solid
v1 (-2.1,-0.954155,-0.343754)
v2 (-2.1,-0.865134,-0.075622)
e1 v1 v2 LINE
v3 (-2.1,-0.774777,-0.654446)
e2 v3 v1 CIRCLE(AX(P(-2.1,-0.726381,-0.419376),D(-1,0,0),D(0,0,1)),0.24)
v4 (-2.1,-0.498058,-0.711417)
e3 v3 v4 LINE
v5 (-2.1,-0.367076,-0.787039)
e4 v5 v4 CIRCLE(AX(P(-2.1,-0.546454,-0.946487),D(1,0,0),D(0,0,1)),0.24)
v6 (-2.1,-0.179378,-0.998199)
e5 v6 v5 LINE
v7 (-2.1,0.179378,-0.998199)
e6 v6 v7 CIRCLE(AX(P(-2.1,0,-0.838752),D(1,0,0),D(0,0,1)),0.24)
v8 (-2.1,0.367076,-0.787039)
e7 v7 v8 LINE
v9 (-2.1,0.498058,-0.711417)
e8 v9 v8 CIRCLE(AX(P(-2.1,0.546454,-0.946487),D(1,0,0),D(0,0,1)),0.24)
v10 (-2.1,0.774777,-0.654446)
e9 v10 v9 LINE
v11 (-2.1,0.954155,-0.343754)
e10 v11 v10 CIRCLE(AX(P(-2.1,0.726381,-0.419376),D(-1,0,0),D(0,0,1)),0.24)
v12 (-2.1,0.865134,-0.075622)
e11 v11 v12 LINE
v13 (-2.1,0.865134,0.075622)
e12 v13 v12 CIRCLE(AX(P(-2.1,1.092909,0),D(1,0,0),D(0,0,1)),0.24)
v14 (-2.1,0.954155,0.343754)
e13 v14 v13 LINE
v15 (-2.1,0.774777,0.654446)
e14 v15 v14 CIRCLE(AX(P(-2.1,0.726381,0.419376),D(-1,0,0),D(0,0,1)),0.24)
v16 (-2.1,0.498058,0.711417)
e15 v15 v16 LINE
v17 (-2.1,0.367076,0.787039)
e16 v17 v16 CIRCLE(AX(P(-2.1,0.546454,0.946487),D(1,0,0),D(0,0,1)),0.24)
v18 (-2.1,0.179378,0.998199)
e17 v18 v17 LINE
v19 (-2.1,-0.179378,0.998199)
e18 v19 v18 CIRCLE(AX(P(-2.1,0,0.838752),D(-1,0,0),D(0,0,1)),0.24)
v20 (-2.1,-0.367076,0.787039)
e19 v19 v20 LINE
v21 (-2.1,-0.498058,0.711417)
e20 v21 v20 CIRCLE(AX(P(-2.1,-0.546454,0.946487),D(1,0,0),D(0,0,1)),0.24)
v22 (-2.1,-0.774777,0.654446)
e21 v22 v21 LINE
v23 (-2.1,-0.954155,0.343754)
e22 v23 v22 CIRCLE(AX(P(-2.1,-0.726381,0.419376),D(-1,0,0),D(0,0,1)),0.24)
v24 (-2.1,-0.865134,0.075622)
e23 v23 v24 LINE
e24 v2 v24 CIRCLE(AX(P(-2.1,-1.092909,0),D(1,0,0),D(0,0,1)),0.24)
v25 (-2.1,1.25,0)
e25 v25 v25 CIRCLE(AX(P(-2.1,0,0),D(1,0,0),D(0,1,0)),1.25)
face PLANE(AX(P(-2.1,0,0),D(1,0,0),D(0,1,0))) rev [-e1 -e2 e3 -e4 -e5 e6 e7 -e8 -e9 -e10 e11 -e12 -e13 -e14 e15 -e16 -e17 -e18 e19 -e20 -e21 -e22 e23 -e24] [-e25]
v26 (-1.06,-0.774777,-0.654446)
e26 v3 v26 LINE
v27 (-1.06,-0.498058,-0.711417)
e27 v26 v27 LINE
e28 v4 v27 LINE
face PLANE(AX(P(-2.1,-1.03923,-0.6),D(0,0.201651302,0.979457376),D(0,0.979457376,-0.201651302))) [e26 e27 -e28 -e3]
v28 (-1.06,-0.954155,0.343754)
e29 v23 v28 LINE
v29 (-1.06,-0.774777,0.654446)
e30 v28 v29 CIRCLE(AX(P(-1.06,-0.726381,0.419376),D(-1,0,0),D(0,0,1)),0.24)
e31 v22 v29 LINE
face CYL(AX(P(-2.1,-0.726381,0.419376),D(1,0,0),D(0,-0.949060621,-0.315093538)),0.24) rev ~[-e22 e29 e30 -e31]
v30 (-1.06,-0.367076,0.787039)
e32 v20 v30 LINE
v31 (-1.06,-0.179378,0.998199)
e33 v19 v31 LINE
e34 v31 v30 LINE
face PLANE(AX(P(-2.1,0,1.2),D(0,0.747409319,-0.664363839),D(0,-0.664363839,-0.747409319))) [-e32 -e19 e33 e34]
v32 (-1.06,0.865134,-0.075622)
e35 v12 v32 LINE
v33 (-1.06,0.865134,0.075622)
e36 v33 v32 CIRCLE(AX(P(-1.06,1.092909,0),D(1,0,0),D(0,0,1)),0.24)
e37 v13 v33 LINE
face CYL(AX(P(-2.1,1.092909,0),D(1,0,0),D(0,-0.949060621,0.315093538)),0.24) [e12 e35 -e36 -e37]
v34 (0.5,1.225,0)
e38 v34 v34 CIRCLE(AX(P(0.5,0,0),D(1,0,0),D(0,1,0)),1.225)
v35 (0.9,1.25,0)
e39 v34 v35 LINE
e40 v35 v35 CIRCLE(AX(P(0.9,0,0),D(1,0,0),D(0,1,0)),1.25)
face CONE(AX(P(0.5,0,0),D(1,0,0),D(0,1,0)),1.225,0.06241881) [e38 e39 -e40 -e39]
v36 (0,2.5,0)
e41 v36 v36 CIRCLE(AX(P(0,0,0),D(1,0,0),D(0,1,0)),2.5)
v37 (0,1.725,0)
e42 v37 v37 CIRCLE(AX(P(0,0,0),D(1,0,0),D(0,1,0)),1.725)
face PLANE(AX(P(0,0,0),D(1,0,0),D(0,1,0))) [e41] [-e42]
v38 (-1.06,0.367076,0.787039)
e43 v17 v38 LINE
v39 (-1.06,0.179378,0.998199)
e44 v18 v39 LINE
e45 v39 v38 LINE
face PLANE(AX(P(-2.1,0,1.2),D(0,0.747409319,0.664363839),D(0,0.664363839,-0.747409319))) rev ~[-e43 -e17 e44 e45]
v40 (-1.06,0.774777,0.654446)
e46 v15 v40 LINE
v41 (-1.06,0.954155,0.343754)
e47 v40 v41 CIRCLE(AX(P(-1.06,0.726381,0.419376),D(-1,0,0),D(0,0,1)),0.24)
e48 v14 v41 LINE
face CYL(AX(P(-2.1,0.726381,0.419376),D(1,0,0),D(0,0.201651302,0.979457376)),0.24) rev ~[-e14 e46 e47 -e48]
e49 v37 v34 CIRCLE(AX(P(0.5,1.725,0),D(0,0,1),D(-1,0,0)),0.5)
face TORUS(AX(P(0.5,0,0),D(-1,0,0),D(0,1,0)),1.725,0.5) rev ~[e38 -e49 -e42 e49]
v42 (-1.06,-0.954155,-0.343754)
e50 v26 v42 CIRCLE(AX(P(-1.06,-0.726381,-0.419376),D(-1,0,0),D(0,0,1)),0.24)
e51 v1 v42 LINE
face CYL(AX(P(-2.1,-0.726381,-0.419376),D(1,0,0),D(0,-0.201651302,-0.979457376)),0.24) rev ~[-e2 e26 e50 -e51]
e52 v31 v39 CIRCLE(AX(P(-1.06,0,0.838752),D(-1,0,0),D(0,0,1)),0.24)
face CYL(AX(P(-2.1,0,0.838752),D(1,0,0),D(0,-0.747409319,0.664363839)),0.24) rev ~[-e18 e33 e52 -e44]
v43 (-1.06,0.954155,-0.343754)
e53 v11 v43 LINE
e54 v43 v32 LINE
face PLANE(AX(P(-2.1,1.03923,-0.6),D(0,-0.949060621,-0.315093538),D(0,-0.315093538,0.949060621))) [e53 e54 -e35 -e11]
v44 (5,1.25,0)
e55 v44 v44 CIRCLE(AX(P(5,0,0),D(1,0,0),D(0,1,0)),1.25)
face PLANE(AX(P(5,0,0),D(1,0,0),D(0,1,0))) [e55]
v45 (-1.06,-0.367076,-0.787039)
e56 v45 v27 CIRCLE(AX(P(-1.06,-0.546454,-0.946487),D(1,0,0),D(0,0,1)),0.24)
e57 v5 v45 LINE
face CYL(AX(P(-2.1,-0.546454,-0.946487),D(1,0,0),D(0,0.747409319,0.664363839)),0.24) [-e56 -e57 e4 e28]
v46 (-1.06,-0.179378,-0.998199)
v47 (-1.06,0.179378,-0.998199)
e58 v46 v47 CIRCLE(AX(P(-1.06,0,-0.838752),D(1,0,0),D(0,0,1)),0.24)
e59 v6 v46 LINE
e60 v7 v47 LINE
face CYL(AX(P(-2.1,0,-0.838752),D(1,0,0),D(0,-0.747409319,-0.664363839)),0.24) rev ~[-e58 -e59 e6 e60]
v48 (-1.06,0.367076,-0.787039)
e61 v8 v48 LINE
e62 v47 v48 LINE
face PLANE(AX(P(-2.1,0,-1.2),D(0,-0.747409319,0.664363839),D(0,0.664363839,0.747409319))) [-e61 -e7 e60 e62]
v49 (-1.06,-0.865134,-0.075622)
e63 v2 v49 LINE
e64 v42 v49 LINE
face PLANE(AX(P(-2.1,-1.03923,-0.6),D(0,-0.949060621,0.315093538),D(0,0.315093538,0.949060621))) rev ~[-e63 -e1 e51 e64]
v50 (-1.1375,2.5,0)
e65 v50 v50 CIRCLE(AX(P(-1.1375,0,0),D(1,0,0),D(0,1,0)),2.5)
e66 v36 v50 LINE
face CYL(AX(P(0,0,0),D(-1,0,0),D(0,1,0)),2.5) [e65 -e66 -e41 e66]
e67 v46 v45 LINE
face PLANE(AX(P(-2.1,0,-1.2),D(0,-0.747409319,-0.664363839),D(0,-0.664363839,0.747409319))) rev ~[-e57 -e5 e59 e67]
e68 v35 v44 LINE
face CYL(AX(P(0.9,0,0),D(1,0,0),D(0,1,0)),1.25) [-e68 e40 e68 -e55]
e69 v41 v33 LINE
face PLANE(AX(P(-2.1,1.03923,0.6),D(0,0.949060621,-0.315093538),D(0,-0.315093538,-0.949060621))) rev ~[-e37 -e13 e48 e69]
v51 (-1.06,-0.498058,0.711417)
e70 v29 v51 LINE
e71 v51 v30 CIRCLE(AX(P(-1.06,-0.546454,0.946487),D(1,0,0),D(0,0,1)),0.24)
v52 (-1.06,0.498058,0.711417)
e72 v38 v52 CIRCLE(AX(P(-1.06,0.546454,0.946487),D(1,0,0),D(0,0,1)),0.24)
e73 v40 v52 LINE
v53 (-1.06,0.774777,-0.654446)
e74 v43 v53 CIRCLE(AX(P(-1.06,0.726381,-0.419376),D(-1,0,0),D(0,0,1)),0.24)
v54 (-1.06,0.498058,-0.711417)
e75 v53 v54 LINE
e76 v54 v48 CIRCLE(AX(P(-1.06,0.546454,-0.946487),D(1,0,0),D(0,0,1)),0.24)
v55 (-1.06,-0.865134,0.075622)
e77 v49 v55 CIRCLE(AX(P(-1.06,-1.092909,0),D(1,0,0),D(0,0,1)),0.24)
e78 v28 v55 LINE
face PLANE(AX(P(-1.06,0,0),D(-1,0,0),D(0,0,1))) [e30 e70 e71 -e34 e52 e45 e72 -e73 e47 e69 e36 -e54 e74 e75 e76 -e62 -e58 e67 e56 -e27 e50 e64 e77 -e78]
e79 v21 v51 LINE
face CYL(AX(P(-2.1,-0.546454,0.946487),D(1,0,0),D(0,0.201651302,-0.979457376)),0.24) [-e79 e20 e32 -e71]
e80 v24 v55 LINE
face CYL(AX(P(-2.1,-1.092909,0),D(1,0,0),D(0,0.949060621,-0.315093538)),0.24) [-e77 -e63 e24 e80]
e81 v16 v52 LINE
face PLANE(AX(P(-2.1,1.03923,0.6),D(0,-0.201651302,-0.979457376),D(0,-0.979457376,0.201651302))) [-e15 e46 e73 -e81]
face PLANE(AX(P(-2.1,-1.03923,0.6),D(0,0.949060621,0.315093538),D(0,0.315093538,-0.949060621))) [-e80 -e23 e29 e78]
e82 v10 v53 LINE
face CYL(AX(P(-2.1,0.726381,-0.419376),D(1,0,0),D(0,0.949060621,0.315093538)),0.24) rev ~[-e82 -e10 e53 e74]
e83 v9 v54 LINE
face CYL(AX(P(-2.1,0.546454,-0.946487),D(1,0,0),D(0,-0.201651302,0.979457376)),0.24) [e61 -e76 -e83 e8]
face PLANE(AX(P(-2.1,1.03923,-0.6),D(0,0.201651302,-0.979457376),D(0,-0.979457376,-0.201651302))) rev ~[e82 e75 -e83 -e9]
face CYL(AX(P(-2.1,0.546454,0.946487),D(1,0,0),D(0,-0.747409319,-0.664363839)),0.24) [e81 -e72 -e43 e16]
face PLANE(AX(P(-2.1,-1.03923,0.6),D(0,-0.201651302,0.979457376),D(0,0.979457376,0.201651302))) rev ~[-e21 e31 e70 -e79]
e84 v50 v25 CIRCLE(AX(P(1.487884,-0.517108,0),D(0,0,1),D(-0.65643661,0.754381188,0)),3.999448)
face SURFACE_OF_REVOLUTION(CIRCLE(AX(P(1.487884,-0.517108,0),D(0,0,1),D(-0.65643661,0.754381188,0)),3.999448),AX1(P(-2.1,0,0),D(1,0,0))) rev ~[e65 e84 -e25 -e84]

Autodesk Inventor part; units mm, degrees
ref_plane "YZ Plane" through (0, 0, 0) normal (1, 0, 0) x (0, 1, 0)
ref_plane "XZ Plane" through (0, 0, 0) normal (0, 1, 0) x (-1, 0, 0)
ref_plane "XY Plane" through (0, 0, 0) normal (0, 0, 1) x (1, 0, 0)
sketch "Sketch4" plane through (0, 0, 0) normal (0, 0, 1) x (1, 0, 0)
  line L0 (-2.1, 0) -> (5, 0)
  line L1 (0, 0) -> (-2.1, 0)
  line L2 (0, 2.5) -> (0, 1.725)
  line L3 (0.5, 1.225) -> (0.5, 1.225)
  line L4 (0.5, 1.225) -> (0.9, 1.25)
  arc A0 (0, 1.725) -> (0.5, 1.225) centre (0.5, 1.725) ccw
  line L5 (-2.1, 0) -> (-2.1, 1.25)
  line L6 (0, 2.5) -> (-1.1375, 2.5)
  arc A1 (-1.1375, 2.5) -> (-2.1, 1.25) centre (1.4883, -0.5175) ccw
  line L7 (0.9, 1.25) -> (5, 1.25)
  line L8 (5, 1.25) -> (5, 0)
  point P0 (0, 1.225)
  dimension "d71" = 0.5
  dimension "d72" = 5
  dimension "d74" = 0.4
  dimension "d75" = 2.45
  dimension "d78" = 2.5
  dimension "d82" = 4
  dimension "d83" = 2.1
  dimension "d84" = 5
  dimension "d104" = 4.1
  dimension "d105" = 2.5
revolve "Revolution7" add sketch "Sketch4" angle 360 about axis through (-2.1, 0, 0) along (1, 0, 0)
sketch "Sketch5" plane through (-2.1, 0, 0) normal (-1, 0, 0) x (0, 0, 1)
  circle A0 centre (0, 0) radius 1.2 construction
  circle A1 centre (0, 0) radius 0.84 construction
  line L0 (0, 0) -> (-0.7275, 0.42)
  line L1 (0, 0) -> (-0.7275, -0.42)
  line L2 (-1.8008, 0) -> (1.7887, 0)
  line L3 (-1.2, 0) -> (-0.7275, -0.42)
  line L4 (-1.2, 0) -> (-0.7275, 0.42)
  dimension "d88" = 2.4
  dimension "d89" = 1.68
  dimension "d90" = 30
  dimension "d91" = 30
extrude "Extrusion1" cut sketch "Sketch5" against normal blind 1.04
pattern_circular "Circular Pattern1" count 6 over 360 about axis through (-10, 0, 0) along (1, 0, 0) of "Extrusion1"
fillet "Fillet1" radius 0.24 12 edges at (-1.58, -1.0392, -0.6) (-1.58, -0.42, -0.7275) (-1.58, -0.84, 0) (-1.58, -1.0392, 0.6) (-1.58, -0.42, 0.7275) (-1.58, 0, 1.2) (-1.58, 0.84, 0) (-1.58, 1.0392, 0.6) (-1.58, 0.42, 0.7275) (-1.58, 0.42, -0.7275) (-1.58, 0, -1.2) (-1.58, 1.0392, -0.6)
thread "Thread7" size "M2.5x0.45" class "6g" standard "ISO Metric profile" length 4.1
equation "\"a\" = 0.9"
equation "\"b\" = 4.1"
equation "\"dk\" = 5"
equation "\"k\" = 2.1"
equation "\"r\" = 0.5"
equation "\"rf\" = 4"
equation "\"x\" = 0.4"
equation "\"A_\" = 2.4"
equation "\"t\" = 1.04"
equation "\"p\" = 0.45"
equation "\"l_\" = 5"
equation "\"d\" = 2.5"
equation "\"ds_\" = 2.45"
equation "\"lg\" = 0"
properties part number "Flachkopfschraube mit Innenrund ISO 14583 - M2,5 x 5 - 4.8" material "Steel"
